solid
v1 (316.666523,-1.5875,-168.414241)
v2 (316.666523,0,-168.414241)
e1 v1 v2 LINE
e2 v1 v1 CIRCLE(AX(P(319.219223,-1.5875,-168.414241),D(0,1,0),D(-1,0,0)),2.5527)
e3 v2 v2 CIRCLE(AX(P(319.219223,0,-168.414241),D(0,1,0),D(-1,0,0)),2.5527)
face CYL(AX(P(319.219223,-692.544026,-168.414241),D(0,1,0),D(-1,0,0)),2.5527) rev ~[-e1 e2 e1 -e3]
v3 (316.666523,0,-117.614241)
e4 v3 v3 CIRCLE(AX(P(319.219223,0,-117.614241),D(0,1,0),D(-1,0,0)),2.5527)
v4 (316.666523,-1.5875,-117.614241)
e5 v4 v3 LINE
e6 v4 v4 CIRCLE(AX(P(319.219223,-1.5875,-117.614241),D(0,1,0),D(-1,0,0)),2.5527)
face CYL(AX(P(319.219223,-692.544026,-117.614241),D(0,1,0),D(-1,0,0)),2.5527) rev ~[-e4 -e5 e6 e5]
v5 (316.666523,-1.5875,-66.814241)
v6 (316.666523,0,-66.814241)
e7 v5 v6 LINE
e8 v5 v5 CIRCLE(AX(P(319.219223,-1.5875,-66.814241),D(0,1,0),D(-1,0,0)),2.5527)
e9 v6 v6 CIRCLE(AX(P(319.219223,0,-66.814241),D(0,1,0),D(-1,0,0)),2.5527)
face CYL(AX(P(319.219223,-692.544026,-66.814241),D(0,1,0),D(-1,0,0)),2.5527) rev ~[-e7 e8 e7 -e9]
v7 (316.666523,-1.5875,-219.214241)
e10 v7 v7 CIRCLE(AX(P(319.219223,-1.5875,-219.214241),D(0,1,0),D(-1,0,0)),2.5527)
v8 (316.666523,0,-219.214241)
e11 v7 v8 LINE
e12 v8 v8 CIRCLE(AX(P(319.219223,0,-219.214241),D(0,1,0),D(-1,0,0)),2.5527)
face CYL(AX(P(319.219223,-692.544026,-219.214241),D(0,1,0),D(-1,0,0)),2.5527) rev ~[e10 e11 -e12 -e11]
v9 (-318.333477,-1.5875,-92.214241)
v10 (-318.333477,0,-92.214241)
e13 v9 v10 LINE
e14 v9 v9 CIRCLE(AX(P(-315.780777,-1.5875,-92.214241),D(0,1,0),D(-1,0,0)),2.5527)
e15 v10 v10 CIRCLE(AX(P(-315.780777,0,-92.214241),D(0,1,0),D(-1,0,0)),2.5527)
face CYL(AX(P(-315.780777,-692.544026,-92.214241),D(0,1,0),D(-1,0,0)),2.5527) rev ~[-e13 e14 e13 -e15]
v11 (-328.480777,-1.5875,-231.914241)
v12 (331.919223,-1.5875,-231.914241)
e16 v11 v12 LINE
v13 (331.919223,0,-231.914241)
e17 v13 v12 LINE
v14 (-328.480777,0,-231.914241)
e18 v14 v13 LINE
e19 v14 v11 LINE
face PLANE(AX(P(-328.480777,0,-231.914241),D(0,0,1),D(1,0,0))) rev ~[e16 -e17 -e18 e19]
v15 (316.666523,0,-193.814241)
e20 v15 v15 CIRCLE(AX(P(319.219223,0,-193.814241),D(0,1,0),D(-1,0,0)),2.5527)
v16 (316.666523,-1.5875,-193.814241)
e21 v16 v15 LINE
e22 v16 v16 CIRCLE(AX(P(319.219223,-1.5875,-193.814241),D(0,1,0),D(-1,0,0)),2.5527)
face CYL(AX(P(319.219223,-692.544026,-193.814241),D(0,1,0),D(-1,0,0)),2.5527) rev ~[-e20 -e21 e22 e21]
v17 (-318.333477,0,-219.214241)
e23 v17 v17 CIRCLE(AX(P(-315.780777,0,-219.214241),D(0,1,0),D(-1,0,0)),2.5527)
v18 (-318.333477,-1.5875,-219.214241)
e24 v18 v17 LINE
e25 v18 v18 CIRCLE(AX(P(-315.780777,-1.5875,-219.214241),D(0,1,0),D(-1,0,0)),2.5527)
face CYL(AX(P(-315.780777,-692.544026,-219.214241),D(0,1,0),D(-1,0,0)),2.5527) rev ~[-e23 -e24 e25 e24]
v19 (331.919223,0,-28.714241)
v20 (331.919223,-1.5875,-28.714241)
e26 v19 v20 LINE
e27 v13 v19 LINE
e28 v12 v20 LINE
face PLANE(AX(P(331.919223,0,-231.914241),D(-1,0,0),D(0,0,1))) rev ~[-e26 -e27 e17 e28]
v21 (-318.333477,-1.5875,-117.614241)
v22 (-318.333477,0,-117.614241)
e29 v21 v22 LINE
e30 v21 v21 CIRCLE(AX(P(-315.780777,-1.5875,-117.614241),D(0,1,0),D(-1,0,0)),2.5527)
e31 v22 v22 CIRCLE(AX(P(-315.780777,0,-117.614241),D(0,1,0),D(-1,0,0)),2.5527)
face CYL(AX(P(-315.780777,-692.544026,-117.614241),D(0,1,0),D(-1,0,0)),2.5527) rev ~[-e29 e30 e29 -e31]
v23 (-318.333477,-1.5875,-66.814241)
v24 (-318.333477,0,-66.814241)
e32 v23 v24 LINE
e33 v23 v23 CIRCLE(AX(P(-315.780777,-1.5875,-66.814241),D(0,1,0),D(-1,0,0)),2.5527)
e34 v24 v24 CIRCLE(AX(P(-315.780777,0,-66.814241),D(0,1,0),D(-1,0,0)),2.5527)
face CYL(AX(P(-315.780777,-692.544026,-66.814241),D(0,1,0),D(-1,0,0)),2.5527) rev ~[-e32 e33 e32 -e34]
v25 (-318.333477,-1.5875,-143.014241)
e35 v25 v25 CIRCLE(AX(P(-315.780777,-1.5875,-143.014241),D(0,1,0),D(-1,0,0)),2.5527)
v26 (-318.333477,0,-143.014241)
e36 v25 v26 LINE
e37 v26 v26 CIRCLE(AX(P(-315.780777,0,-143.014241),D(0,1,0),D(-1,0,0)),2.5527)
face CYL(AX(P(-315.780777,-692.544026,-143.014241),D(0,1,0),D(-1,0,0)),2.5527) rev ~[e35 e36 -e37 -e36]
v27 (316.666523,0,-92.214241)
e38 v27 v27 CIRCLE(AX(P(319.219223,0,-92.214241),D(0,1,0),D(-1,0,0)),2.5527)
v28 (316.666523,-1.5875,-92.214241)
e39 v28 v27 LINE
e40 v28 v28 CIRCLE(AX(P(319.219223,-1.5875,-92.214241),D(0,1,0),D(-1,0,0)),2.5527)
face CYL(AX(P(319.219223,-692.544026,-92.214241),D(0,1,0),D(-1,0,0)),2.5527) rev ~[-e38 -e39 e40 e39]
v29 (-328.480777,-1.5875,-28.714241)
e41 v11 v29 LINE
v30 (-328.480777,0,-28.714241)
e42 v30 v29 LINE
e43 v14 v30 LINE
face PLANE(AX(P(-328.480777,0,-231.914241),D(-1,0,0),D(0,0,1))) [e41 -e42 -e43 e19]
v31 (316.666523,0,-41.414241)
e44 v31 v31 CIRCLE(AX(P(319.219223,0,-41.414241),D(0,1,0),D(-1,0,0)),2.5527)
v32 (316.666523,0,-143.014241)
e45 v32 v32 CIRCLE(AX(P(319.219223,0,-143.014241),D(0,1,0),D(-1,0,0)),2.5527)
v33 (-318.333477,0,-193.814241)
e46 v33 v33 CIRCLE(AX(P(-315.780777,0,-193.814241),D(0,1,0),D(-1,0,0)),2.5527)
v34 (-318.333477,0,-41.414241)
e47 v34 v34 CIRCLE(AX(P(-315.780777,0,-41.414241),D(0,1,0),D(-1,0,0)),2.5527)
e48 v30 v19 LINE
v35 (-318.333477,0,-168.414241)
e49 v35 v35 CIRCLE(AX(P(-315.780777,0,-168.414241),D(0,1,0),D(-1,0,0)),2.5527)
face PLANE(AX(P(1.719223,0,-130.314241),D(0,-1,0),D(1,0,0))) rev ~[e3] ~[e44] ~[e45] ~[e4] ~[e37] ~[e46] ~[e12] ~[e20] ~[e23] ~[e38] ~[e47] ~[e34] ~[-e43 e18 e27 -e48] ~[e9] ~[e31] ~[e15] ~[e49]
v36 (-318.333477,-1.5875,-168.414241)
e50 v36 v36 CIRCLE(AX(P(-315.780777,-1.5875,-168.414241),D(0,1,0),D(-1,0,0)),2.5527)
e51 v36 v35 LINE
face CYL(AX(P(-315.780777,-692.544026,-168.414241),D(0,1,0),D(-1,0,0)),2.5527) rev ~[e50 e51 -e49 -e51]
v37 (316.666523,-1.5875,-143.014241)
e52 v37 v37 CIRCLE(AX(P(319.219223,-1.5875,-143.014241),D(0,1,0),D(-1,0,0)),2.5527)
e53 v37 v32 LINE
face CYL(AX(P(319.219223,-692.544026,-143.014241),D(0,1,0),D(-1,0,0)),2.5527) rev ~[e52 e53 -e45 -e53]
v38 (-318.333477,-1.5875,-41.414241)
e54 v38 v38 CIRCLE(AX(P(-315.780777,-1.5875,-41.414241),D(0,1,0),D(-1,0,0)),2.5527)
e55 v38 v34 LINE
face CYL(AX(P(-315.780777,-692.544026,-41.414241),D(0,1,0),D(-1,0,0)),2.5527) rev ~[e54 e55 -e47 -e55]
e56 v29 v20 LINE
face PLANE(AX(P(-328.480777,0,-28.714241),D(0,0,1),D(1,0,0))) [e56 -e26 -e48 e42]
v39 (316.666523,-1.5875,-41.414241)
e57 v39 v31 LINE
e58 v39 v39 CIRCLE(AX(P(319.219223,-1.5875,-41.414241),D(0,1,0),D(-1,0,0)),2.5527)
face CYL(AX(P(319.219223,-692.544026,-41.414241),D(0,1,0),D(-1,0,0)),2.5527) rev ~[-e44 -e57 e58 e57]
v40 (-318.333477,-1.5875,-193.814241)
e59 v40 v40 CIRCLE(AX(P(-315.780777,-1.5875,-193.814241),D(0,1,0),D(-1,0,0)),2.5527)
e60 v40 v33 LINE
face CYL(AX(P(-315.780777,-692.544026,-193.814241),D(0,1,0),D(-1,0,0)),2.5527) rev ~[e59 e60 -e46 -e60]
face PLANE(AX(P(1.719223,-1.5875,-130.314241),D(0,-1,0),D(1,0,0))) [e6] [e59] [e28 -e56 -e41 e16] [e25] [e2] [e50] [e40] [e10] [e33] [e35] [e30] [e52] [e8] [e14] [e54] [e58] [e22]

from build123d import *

# Parameters (mm, degrees)
F0_W     = 660.4
F0_H     = 203.2
F1_DEPTH = 1.5875
F3_D     = 5.1054


# Not quite as in the source:
# - a length typed as a fraction of an inch, garbled in the dataset ("3 / 203.2 mm" for 3/8 in), is restored


with BuildPart() as f1:
    # F0 (on Front) → F1 (new body)
    with BuildSketch(Plane.XZ):
        with Locations((1.7192233354, -130.3142405412)):
            Rectangle(F0_W, F0_H)
    extrude(amount=F1_DEPTH)

    # F3 (through all)
    with Locations(Plane.XZ.offset(1.5875)):
        with Locations((-315.7807766646, -92.2142405412), (-315.7807766646, -117.6142405412), (-315.7807766646, -143.0142405412), (319.2192233354, -219.2142405412), (319.2192233354, -168.4142405412), (319.2192233354, -117.6142405412), (319.2192233354, -66.8142405412), (319.2192233354, -193.8142405412), (319.2192233354, -143.0142405412), (-315.7807766646, -168.4142405412), (319.2192233354, -92.2142405412), (-315.7807766646, -193.8142405412), (-315.7807766646, -219.2142405412), (-315.7807766646, -41.4142405412), (-315.7807766646, -66.8142405412), (319.2192233354, -41.4142405412)):
            Hole(F3_D / 2)


solid = f1.part
